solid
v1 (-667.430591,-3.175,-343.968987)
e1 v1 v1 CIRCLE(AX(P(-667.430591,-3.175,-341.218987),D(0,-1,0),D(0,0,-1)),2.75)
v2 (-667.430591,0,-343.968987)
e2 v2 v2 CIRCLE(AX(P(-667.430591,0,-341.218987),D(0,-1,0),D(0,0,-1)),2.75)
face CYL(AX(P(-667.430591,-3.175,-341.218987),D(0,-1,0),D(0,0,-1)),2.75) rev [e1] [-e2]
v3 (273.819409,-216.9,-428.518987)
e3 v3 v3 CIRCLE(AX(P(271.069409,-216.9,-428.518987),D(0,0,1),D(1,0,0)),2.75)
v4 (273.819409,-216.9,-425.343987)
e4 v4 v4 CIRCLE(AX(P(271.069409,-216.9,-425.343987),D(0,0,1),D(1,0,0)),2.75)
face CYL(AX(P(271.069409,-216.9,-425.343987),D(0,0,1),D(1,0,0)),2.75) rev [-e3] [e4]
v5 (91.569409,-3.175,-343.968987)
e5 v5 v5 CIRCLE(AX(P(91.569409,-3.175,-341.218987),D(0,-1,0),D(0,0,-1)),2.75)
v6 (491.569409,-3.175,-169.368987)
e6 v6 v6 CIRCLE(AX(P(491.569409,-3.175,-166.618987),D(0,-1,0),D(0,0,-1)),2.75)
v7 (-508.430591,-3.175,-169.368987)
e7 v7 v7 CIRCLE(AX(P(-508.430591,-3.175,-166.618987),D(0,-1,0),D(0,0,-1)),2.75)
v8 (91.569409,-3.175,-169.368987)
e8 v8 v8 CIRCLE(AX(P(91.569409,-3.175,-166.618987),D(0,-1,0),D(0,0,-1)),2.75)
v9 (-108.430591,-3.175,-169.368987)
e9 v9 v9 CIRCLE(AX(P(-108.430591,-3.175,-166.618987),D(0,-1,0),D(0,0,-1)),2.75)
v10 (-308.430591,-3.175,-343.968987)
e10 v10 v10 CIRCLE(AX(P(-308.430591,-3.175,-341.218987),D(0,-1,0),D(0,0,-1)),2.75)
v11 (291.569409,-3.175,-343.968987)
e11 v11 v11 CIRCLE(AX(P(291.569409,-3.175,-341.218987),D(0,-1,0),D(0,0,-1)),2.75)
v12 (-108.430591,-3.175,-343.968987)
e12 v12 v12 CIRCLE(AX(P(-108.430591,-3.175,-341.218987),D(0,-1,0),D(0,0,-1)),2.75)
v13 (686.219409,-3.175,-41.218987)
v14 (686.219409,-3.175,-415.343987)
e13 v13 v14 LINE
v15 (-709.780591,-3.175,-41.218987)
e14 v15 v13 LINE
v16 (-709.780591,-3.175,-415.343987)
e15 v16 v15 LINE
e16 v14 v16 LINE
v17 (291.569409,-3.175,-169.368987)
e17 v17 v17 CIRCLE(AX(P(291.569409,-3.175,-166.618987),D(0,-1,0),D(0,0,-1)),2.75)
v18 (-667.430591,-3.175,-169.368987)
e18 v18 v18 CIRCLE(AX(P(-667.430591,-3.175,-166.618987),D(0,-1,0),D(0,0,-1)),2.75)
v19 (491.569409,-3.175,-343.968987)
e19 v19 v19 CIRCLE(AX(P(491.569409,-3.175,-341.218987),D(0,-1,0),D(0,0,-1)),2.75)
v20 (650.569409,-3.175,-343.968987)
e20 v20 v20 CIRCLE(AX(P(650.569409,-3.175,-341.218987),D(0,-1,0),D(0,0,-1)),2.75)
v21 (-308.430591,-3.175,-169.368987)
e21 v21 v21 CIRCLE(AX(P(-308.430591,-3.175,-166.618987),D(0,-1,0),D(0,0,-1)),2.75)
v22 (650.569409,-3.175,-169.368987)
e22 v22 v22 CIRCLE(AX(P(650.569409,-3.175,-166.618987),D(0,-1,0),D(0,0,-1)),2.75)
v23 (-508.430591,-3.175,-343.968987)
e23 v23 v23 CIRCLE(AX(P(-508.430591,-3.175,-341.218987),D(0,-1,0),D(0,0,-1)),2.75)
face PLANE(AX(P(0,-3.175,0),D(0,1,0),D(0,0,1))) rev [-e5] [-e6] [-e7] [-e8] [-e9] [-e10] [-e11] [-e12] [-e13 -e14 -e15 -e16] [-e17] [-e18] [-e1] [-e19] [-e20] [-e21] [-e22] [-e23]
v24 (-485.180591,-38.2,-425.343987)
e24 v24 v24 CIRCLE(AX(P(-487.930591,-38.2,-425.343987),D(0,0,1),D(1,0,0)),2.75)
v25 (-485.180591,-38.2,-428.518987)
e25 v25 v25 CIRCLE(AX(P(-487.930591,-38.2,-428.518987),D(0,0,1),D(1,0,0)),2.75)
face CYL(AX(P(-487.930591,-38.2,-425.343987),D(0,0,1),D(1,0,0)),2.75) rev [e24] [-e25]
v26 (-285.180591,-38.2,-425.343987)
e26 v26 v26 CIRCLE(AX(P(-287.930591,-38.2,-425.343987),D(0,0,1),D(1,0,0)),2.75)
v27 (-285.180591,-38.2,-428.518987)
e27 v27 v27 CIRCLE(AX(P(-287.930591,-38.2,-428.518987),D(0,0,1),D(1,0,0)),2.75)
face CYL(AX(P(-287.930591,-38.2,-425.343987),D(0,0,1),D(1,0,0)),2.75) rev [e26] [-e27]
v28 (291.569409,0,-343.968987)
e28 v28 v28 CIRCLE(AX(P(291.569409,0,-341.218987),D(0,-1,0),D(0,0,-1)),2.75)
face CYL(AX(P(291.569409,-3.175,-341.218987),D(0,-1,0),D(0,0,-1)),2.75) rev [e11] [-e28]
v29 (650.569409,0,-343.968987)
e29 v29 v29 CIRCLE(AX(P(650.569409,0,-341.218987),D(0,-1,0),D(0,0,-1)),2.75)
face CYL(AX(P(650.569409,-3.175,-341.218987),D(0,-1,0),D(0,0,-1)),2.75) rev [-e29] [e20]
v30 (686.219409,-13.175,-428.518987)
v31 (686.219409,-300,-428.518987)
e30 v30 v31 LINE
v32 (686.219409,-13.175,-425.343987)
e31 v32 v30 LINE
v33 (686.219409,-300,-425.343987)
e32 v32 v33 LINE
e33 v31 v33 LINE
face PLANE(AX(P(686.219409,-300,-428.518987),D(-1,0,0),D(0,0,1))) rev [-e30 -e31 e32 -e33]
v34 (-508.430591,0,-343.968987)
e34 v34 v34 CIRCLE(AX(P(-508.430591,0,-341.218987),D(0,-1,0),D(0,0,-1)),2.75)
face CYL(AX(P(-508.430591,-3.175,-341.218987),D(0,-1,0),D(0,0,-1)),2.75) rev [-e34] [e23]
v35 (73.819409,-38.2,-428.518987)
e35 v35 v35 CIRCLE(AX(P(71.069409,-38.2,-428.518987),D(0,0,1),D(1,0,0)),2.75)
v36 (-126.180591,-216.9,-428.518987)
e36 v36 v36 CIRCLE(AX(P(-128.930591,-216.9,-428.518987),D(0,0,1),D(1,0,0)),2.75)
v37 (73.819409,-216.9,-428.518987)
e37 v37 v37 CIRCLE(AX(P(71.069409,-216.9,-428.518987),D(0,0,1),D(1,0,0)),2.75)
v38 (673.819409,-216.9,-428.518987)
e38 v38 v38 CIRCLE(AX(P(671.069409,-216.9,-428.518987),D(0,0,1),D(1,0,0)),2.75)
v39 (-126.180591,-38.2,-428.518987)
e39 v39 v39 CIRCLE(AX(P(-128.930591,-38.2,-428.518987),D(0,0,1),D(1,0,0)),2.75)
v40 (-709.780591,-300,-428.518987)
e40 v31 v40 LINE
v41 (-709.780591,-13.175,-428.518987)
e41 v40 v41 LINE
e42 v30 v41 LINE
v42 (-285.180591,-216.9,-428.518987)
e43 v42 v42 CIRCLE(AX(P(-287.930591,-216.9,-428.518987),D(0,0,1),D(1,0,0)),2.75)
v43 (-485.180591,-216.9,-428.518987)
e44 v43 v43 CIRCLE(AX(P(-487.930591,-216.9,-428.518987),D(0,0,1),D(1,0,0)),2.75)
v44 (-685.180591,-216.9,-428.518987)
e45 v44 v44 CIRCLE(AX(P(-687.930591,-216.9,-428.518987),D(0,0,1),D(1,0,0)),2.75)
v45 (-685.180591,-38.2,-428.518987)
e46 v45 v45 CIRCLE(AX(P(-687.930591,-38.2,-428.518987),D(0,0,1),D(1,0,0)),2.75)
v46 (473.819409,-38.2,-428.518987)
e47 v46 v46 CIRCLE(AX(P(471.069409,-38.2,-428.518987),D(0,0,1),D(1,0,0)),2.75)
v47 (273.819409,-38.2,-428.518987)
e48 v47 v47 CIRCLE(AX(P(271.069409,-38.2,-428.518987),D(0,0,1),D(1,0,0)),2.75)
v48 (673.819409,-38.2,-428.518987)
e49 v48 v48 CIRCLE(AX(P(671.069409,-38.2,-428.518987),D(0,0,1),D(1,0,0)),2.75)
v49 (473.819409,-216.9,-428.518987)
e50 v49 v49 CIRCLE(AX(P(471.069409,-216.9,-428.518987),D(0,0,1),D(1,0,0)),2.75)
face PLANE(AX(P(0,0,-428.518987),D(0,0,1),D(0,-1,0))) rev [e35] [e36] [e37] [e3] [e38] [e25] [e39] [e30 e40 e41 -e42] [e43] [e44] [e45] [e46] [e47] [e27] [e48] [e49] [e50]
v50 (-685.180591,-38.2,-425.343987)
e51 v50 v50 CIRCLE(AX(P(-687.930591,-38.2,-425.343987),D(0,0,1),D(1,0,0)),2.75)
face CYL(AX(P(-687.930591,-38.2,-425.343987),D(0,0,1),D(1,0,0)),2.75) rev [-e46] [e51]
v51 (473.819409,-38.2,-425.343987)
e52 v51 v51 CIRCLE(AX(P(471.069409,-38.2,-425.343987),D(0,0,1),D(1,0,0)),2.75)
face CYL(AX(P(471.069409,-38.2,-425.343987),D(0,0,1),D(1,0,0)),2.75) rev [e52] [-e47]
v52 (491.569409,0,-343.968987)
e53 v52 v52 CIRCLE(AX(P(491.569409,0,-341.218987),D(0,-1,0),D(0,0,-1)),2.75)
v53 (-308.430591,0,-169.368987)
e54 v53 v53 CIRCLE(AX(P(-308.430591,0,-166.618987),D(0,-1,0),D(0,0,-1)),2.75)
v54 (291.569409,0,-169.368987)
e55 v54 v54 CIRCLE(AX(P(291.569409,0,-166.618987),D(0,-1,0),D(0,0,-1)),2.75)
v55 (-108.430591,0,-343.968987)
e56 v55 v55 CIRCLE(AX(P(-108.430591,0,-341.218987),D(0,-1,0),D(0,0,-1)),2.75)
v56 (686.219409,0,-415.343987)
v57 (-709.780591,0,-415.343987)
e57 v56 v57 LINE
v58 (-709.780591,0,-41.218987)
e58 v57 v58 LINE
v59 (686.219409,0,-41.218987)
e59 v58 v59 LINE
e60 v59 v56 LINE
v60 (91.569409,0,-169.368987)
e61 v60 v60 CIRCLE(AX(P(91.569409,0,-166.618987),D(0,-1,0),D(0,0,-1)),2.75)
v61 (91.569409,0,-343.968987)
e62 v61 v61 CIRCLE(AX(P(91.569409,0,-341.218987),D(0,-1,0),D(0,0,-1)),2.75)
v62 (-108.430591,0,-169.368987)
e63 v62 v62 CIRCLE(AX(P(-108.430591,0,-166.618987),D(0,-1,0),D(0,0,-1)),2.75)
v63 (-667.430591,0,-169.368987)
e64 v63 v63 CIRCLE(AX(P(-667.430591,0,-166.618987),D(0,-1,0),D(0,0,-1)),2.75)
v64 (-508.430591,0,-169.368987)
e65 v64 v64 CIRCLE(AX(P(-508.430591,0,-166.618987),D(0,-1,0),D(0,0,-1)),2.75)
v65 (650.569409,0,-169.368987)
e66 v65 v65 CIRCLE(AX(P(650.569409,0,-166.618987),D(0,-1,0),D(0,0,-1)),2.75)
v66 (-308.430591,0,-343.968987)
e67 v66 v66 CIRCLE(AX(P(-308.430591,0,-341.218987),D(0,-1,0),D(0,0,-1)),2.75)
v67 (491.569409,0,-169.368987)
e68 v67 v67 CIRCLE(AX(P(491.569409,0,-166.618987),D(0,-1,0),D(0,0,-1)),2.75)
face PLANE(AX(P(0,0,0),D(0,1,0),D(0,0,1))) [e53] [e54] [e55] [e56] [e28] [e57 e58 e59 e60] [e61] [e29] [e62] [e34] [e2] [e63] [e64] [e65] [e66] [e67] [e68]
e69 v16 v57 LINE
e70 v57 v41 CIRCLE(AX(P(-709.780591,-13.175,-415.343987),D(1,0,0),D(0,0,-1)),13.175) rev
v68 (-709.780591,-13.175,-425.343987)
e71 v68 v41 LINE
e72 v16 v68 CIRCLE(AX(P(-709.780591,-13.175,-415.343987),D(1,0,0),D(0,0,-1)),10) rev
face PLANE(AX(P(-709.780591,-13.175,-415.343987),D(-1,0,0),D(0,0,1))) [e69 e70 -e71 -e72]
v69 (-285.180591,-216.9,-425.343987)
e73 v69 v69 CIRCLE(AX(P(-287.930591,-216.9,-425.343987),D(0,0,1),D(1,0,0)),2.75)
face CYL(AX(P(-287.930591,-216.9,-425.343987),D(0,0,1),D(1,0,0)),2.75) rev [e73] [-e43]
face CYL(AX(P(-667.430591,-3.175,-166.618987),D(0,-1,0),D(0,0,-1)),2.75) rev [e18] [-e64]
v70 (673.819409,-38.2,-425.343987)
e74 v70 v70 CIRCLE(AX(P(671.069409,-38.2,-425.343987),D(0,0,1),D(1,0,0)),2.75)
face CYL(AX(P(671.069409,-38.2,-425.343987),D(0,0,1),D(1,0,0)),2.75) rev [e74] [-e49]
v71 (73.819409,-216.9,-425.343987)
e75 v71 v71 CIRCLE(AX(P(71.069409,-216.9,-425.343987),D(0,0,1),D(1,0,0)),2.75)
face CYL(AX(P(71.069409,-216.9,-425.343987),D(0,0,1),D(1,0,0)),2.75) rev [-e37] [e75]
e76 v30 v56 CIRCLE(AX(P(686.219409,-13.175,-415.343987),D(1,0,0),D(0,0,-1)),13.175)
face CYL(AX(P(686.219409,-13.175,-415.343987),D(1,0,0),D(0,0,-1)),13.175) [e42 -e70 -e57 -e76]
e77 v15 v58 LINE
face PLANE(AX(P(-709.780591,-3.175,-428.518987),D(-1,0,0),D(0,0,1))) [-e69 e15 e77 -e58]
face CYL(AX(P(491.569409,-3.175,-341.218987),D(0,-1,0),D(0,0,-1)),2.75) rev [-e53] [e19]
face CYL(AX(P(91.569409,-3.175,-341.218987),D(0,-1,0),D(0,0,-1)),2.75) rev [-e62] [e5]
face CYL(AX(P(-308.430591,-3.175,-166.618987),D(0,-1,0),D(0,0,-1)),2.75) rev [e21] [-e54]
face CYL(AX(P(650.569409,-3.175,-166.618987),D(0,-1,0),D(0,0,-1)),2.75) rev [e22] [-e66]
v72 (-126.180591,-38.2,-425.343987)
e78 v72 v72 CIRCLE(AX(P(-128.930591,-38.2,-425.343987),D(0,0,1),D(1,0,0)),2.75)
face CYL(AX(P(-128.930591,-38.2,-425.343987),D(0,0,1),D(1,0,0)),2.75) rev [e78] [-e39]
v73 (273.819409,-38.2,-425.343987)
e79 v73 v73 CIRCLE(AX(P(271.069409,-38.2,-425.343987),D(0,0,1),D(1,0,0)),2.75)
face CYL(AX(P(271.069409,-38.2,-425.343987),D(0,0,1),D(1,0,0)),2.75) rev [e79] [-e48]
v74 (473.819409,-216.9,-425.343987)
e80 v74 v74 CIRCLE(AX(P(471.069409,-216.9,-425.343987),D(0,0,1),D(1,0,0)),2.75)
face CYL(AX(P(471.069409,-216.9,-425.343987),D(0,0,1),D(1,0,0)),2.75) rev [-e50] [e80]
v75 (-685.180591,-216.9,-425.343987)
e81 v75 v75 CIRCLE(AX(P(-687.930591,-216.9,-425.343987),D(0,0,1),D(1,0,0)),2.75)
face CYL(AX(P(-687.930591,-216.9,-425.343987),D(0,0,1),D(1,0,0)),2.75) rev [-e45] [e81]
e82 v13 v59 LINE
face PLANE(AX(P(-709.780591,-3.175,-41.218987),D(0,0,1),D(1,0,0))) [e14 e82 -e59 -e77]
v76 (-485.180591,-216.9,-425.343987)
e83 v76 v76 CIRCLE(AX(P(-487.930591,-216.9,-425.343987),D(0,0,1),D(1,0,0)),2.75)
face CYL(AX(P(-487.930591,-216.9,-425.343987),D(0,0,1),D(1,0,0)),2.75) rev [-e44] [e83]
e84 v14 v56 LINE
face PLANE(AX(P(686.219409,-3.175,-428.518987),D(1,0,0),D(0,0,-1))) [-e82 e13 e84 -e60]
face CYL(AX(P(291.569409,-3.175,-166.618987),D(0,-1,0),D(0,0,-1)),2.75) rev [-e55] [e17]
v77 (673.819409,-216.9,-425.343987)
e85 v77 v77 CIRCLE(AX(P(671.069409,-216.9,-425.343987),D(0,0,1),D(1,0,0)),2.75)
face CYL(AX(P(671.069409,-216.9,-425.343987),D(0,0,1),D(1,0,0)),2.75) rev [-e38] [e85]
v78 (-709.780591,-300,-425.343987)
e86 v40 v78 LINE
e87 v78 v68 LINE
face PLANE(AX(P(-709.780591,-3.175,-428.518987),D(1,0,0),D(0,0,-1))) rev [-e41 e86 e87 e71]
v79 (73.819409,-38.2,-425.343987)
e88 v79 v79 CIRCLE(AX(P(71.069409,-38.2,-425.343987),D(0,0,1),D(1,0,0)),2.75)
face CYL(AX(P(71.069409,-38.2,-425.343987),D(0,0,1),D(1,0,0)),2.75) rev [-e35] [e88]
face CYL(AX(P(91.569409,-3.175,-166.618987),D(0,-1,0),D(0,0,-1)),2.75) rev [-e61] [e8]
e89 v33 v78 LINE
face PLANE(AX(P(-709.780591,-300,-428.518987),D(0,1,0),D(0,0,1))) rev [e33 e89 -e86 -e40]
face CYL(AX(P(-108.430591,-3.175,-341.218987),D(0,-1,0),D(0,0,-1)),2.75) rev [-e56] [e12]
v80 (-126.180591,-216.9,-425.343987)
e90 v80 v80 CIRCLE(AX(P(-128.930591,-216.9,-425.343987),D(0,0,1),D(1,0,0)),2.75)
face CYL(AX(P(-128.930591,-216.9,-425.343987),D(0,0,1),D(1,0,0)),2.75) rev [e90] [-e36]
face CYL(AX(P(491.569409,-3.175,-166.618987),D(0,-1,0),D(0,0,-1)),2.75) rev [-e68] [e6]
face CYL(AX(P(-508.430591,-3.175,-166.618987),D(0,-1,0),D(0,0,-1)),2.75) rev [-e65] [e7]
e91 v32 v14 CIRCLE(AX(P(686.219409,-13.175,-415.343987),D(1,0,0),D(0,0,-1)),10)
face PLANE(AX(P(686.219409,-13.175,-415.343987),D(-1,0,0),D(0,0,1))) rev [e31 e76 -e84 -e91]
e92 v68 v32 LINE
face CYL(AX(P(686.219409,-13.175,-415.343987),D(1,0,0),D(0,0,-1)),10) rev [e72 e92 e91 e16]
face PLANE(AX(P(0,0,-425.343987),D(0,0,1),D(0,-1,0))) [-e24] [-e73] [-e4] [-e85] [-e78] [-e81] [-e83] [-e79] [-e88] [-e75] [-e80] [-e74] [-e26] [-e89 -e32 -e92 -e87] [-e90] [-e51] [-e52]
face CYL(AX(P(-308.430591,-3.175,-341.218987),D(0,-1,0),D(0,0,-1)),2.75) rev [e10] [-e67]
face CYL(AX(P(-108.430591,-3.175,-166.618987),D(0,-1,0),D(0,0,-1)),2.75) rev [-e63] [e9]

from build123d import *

# Parameters (mm, degrees)
CROQUIS1_W                       = 1396
CROQUIS1_H                       = 387.3
BRIDA_BASE1_DEPTH                = 3.175
TALADRO_DE_MARGEN_PARA_M51_D     = 5.5
BRIDA_DE_ARISTA1_STRIP_W         = 32.7
BRIDA_DE_ARISTA1_STRIP_H         = 3.175
BRIDA_DE_ARISTA1_STRIP_CUT_DEPTH = 1396
BRIDA_DE_ARISTA1_DEPTH           = 1396
TALADRO_DE_MARGEN_PARA_M52_D     = 5.5


# Sheet-metal steps are written as plain solids
with BuildPart() as part:
    # Croquis1 → Brida base1 (new body)
    with BuildSketch(Plane(origin=(0, 0, 0), x_dir=(1, 0, 0), z_dir=(0, 1, 0))):
        with Locations((-11.780590717, 234.868987342)):
            Rectangle(CROQUIS1_W, CROQUIS1_H)
    extrude(amount=-BRIDA_BASE1_DEPTH)

    # Taladro de margen para M51 (through all)
    with Locations(Plane(origin=(0, -3.175, 0), x_dir=(-1, 0, 0), z_dir=(0, -1, 0))):
        with Locations((508.430590717, 166.618987342), (508.430590717, 341.218987342), (308.430590717, 166.618987342), (308.430590717, 341.218987342), (108.430590717, 166.618987342), (108.430590717, 341.218987342), (-91.569409283, 166.618987342), (-91.569409283, 341.218987342), (-291.569409283, 166.618987342), (-291.569409283, 341.218987342), (-491.569409283, 166.618987342), (-491.569409283, 341.218987342), (667.430590717, 166.618987342), (667.430590717, 341.218987342), (-650.569409283, 166.618987342), (-650.569409283, 341.218987342)):
            Hole(TALADRO_DE_MARGEN_PARA_M51_D / 2)

    # Brida de arista1 strip (across the edge) → Brida de arista1 strip cut (cut)
    with BuildSketch(Plane(origin=(-709.780590717, -3.175, -428.518987342), x_dir=(0, 0, 1), z_dir=(1, 0, 0))):
        with Locations((-3.175, -1.5875)):
            Rectangle(BRIDA_DE_ARISTA1_STRIP_W, BRIDA_DE_ARISTA1_STRIP_H)
    extrude(amount=BRIDA_DE_ARISTA1_STRIP_CUT_DEPTH, mode=Mode.SUBTRACT)

    # Brida de arista1 section (across the edge) → Brida de arista1 (add)
    with BuildSketch(Plane(origin=(-709.780590717, -3.175, -428.518987342), x_dir=(0, 0, 1), z_dir=(1, 0, 0))):
        with BuildLine():
            Line((0, 10), (0, 296.825))
            Line((0, 296.825), (3.175, 296.825))
            Line((3.175, 296.825), (3.175, 10))
            ThreePointArc((3.175, 10), (6.103932188, 2.928932188), (13.175, 0))
            Line((13.175, 0), (13.175, -3.175))
            ThreePointArc((13.175, -3.175), (3.858868158, 0.683868158), (0, 10))
        make_face()
    extrude(amount=BRIDA_DE_ARISTA1_DEPTH)

    # Taladro de margen para M52 (through all)
    with Locations(Plane.XY.offset(-425.343987342)):
        with Locations((-687.930590717, -216.9), (-687.930590717, -38.2), (-487.930590717, -216.9), (-487.930590717, -38.2), (-287.930590717, -216.9), (-287.930590717, -38.2), (-128.930590717, -216.9), (-128.930590717, -38.2), (71.069409283, -216.9), (71.069409283, -38.2), (271.069409283, -216.9), (271.069409283, -38.2), (471.069409283, -216.9), (471.069409283, -38.2), (671.069409283, -216.9), (671.069409283, -38.2)):
            Hole(TALADRO_DE_MARGEN_PARA_M52_D / 2)


solid = part.part
